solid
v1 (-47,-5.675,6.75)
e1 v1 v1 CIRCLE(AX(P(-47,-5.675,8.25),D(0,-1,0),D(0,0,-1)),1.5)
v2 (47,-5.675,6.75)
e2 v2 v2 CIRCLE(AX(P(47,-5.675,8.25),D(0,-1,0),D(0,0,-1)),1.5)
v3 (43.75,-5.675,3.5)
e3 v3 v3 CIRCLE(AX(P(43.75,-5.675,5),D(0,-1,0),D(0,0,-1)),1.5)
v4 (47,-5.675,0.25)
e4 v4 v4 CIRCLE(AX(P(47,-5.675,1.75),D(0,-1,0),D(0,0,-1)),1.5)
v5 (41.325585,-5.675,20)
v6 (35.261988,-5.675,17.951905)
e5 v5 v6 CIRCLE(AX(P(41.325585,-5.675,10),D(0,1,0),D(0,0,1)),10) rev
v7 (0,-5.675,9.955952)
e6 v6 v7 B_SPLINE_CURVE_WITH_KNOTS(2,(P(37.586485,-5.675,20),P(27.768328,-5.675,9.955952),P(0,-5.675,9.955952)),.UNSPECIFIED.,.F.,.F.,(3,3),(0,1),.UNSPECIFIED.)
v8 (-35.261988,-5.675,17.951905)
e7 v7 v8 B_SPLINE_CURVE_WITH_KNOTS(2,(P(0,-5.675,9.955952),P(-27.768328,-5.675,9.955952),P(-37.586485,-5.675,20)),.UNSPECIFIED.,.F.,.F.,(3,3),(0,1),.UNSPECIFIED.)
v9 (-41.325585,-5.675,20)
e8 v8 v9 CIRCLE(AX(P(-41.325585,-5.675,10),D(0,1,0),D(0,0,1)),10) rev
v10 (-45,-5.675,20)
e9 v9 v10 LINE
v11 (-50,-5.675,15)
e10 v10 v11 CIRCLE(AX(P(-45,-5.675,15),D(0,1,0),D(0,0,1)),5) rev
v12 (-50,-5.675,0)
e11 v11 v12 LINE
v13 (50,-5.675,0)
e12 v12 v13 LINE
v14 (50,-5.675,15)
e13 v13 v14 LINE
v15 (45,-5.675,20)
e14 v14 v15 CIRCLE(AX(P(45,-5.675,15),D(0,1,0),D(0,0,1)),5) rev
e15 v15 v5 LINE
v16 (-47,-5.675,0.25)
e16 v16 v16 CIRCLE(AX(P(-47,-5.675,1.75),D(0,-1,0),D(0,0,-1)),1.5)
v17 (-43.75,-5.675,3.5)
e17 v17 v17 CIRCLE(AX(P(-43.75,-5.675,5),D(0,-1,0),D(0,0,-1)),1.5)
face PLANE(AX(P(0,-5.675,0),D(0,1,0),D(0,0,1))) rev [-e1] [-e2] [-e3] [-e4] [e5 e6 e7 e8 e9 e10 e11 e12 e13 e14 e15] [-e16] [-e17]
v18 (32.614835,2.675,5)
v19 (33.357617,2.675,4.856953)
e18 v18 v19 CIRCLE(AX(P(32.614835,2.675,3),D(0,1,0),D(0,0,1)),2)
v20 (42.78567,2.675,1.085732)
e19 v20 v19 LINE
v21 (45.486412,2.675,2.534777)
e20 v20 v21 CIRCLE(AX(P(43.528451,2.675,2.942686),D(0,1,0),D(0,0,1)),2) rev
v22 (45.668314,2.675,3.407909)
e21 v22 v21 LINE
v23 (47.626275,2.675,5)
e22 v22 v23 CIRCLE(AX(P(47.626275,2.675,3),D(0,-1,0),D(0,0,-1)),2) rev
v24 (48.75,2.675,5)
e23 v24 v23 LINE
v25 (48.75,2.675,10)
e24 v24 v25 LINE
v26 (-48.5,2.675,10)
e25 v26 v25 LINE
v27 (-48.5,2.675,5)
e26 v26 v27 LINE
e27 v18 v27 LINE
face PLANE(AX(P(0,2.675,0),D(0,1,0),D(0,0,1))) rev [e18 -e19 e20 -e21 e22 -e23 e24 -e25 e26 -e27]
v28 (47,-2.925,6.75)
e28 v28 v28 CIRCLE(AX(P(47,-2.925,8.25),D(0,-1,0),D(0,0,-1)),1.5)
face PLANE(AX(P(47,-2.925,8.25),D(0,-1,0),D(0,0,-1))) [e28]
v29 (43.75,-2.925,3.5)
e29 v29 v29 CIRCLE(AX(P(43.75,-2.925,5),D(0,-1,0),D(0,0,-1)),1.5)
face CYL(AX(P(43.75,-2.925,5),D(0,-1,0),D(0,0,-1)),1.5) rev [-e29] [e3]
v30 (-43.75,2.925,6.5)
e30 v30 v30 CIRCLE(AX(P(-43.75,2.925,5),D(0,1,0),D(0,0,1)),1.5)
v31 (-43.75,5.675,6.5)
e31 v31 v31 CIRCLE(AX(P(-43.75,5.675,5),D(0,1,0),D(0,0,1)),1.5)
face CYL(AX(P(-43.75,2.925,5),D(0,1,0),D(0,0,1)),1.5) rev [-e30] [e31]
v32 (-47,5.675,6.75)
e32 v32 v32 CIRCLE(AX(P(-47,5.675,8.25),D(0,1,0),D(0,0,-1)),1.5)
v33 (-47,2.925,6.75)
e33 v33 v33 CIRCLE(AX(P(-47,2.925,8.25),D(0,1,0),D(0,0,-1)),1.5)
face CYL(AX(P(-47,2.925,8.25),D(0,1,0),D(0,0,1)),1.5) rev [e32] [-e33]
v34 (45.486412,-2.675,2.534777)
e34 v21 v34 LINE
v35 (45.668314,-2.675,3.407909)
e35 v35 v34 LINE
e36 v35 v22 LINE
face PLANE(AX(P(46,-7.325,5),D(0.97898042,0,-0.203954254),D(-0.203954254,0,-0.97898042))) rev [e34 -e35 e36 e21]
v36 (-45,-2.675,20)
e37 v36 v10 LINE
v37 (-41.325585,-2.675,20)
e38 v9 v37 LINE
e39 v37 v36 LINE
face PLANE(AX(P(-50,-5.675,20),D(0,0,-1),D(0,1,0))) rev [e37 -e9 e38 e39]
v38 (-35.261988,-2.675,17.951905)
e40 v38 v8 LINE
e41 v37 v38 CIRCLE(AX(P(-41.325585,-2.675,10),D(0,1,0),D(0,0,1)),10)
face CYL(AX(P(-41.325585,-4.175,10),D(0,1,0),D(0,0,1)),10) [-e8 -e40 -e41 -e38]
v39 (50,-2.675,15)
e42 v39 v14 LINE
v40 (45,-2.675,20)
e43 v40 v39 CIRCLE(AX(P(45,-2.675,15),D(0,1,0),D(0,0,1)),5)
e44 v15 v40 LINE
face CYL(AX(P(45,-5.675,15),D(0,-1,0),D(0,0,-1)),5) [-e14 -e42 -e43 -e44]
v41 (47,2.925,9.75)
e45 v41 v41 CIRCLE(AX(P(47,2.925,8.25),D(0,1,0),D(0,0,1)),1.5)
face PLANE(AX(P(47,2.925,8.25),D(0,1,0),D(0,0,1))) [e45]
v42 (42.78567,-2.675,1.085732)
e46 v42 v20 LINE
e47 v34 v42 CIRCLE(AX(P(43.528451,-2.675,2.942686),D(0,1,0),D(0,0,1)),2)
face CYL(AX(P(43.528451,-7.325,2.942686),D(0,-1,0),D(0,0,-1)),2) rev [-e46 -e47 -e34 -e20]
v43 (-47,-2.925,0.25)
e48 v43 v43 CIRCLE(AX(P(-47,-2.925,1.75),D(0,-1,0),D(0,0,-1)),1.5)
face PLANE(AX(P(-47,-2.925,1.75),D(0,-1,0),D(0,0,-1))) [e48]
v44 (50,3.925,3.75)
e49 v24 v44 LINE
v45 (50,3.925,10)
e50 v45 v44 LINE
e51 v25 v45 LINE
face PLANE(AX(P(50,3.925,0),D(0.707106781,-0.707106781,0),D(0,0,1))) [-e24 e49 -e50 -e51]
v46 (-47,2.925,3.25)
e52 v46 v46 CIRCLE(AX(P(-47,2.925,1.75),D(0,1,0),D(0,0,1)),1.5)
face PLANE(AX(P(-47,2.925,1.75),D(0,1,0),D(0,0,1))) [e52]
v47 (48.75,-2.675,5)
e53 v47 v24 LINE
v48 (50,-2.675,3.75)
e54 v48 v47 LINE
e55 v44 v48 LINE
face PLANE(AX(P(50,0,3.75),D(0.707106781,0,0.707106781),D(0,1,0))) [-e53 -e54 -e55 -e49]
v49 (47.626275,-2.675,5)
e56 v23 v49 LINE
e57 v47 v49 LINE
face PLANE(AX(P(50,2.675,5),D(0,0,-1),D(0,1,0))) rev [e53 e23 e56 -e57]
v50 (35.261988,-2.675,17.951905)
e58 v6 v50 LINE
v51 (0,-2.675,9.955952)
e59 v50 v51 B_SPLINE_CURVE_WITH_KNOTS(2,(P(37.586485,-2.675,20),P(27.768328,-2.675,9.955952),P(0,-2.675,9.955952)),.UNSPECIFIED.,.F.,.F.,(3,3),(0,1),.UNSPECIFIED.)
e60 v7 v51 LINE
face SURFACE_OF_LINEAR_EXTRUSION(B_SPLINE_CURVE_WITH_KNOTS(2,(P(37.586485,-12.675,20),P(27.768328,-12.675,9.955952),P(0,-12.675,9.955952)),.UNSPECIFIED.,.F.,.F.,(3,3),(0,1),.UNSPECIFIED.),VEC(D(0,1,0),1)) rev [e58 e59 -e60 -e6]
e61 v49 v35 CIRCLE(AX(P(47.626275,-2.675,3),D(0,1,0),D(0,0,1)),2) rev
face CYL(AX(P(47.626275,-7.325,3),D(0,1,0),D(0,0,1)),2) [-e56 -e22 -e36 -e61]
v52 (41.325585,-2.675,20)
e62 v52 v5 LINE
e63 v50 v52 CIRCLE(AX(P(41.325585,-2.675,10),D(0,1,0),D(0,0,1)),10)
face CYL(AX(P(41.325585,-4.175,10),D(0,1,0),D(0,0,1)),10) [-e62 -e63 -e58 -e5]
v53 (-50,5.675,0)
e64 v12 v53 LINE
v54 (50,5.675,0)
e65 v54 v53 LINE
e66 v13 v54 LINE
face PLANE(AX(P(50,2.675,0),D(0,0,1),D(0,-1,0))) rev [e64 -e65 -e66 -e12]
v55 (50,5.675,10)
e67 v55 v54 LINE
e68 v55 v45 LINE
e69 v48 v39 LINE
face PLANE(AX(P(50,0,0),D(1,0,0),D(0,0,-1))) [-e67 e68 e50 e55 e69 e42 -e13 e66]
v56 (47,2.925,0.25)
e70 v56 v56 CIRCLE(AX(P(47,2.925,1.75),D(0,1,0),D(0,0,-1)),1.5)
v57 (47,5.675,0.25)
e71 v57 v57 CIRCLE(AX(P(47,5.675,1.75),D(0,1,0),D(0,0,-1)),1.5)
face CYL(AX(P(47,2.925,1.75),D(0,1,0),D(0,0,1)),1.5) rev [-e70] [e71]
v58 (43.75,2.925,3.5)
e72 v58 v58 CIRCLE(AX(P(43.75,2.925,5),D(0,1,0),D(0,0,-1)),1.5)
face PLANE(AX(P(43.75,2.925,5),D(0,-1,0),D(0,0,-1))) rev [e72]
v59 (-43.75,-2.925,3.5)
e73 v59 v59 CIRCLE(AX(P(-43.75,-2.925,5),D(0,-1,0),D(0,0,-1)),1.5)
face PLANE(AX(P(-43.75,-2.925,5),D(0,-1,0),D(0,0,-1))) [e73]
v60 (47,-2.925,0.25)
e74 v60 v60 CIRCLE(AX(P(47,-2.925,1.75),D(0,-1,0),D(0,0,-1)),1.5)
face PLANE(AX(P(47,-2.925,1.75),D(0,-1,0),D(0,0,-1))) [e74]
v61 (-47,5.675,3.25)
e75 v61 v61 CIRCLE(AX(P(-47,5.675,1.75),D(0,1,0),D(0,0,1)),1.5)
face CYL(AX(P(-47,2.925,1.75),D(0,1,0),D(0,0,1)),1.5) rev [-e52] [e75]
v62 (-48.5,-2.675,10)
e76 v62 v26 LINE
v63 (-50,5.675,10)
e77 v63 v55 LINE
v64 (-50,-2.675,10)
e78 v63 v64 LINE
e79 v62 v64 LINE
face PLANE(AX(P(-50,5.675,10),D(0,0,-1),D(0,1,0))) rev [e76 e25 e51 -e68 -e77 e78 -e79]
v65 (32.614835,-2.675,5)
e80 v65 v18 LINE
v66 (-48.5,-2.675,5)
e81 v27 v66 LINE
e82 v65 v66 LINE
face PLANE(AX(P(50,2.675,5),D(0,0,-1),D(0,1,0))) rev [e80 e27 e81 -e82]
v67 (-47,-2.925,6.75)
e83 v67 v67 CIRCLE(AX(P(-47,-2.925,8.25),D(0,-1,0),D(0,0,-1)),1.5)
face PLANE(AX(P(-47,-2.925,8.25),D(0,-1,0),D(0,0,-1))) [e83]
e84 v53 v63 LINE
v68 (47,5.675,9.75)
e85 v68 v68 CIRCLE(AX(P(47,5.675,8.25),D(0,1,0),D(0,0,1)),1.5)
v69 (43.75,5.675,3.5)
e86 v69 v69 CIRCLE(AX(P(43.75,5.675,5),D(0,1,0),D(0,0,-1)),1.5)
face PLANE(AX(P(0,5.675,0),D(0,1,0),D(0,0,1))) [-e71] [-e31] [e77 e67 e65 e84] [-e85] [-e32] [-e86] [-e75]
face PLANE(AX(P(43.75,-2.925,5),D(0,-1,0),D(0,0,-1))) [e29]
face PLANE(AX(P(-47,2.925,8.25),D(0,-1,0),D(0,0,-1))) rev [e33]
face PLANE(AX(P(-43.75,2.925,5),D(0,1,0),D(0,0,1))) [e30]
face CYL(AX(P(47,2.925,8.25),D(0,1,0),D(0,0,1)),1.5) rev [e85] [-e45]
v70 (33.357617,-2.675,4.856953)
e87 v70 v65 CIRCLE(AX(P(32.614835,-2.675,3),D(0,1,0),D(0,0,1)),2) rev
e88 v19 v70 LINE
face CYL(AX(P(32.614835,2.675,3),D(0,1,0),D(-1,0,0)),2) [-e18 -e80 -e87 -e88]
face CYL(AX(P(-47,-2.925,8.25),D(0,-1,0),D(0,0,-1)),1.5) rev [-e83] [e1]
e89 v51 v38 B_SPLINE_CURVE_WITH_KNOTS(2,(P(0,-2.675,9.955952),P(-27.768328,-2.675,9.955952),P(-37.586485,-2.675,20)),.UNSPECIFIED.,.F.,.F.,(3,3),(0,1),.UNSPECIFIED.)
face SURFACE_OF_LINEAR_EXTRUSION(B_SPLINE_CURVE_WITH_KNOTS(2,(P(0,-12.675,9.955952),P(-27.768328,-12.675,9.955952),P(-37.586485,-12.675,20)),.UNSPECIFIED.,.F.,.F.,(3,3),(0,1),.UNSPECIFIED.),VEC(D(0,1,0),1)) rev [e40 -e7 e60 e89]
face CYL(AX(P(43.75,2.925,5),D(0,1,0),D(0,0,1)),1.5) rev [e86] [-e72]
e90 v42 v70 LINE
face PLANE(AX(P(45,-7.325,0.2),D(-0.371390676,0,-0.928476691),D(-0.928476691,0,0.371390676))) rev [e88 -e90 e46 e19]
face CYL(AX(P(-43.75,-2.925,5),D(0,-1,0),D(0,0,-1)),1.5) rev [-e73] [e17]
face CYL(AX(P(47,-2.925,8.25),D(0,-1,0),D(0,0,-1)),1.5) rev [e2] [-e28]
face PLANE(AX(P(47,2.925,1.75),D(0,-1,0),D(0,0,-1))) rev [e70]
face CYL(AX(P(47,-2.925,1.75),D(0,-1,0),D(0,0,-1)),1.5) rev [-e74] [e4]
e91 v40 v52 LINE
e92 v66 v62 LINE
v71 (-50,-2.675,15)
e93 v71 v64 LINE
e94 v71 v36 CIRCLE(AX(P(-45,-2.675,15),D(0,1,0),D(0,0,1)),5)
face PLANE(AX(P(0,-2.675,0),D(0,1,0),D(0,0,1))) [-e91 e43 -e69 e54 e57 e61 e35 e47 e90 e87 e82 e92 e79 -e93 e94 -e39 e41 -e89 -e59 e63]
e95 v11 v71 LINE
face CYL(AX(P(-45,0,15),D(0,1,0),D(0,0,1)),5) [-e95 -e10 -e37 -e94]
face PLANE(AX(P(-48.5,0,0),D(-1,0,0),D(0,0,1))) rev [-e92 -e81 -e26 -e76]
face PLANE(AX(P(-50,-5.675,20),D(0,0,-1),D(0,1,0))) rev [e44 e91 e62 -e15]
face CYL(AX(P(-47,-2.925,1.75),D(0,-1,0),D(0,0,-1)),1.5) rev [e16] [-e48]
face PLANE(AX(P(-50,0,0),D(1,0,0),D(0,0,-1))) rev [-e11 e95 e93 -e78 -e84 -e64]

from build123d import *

# Parameters (mm, degrees)
ESBO_O1_W                = 5
ESBO_O1_H                = 5.35
RESSALTO_EXTRUS_O1_DEPTH = 50
CORTE_EXTRUS_O5_START    = -2.675
CORTE_EXTRUS_O5_DEPTH    = 5.35
FILETE2_R                = 2
SKETCH1_W                = 100
SKETCH1_H                = 10
BOSS_EXTRUDE1_DEPTH      = 3
SKETCH2_W                = 100
SKETCH2_H                = 20
BOSS_EXTRUDE2_DEPTH      = 3
FILLET1_R                = 2
FILLET2_R                = 2
CUT_EXTRUDE1_START       = 2.925
CUT_EXTRUDE1_OUTLINE_R   = 1.5
CUT_EXTRUDE1_DEPTH       = 2.75
SKETCH6_W                = 5
SKETCH6_H                = 5.35
BOSS_EXTRUDE4_DEPTH      = 1.5
SKETCH8_R                = 1.5
CUT_EXTRUDE2_DEPTH       = 2.75
CHAMFER2_SIZE            = 1.25
CUT_EXTRUDE3_DEPTH       = 10
FILLET3_R                = 10
FILLET4_R                = 5


# Read off the part's stored shape, not the designer's step: Corte-extrusão5, Cut-Extrude1
with BuildPart() as part:
    # Esboço1 → Ressalto-extrusão1 (new, symmetric)
    with BuildSketch(Plane(origin=(0, 0, 0), x_dir=(0, 0, -1), z_dir=(1, 0, 0))):
        with Locations((-2.5, 0)):
            Rectangle(ESBO_O1_W, ESBO_O1_H)
    extrude(amount=RESSALTO_EXTRUS_O1_DEPTH, both=True)

    # Corte-extrusão5 outline → Corte-extrusão5 (cut)
    with BuildSketch(Plane(origin=(0, 0, 0), x_dir=(1, 0, 0), z_dir=(0, 1, 0)).offset(CORTE_EXTRUS_O5_START)):
        Polygon((46, -5), (45, -0.2), (33, -5), align=None)
    extrude(amount=CORTE_EXTRUS_O5_DEPTH, mode=Mode.SUBTRACT)

    # Filete2
    filete2_edges = [part.edges().sort_by_distance(p)[0] for p in [
        (46, 0, 5),
    ]]
    fillet(filete2_edges, radius=FILETE2_R)

    # Sketch1 → Boss-Extrude1 (add)
    with BuildSketch(Plane(origin=(0, 2.675, 0), x_dir=(1, 0, 0), z_dir=(0, 1, 0))):
        with Locations((0, -5)):
            Rectangle(SKETCH1_W, SKETCH1_H)
    extrude(amount=BOSS_EXTRUDE1_DEPTH)

    # Sketch2 → Boss-Extrude2 (add)
    with BuildSketch(Plane.XZ.offset(2.675)):
        with Locations((0, 10)):
            Rectangle(SKETCH2_W, SKETCH2_H)
    extrude(amount=BOSS_EXTRUDE2_DEPTH)

    # Fillet1
    fillet1_edges = [part.edges().sort_by_distance(p)[0] for p in [
        (45, 0, 0.2),
    ]]
    fillet(fillet1_edges, radius=FILLET1_R)

    # Fillet2
    fillet2_edges = [part.edges().sort_by_distance(p)[0] for p in [
        (33, 0, 5),
    ]]
    fillet(fillet2_edges, radius=FILLET2_R)

    # Cut-Extrude1 outline → Cut-Extrude1 (cut)
    with BuildSketch(Plane(origin=(0, 0, 0), x_dir=(1, 0, 0), z_dir=(0, 1, 0)).offset(CUT_EXTRUDE1_START)):
        with Locations((-43.75, -5)):
            Circle(CUT_EXTRUDE1_OUTLINE_R)
        with Locations((43.75, -5)):
            Circle(CUT_EXTRUDE1_OUTLINE_R)
        with Locations((47, -1.75)):
            Circle(CUT_EXTRUDE1_OUTLINE_R)
        with Locations((47, -8.25)):
            Circle(CUT_EXTRUDE1_OUTLINE_R)
        with Locations((-47, -8.25)):
            Circle(CUT_EXTRUDE1_OUTLINE_R)
        with Locations((-47, -1.75)):
            Circle(CUT_EXTRUDE1_OUTLINE_R)
    extrude(amount=CUT_EXTRUDE1_DEPTH, mode=Mode.SUBTRACT)

    # Sketch6 → Boss-Extrude4 (add)
    with BuildSketch(Plane.ZY.offset(50)):
        with Locations((7.5, 0)):
            Rectangle(SKETCH6_W, SKETCH6_H)
    extrude(amount=-BOSS_EXTRUDE4_DEPTH)

    # Sketch8 → Cut-Extrude2 (cut)
    with BuildSketch(Plane.XZ.offset(5.675)):
        with Locations(Location((47, 8.25, 0), (0, 0, 90))):
            Circle(SKETCH8_R)
        with Locations(Location((43.75, 5, 0), (0, 0, 270))):
            Circle(SKETCH8_R)
        with Locations(Location((47, 1.75, 0), (0, 0, 270))):
            Circle(SKETCH8_R)
        with Locations(Location((-47, 8.25, 0), (0, 0, 270))):
            Circle(SKETCH8_R)
        with Locations(Location((-43.75, 5, 0), (0, 0, 90))):
            Circle(SKETCH8_R)
        with Locations(Location((-47, 1.75, 0), (0, 0, 90))):
            Circle(SKETCH8_R)
    extrude(amount=-CUT_EXTRUDE2_DEPTH, mode=Mode.SUBTRACT)

    # Chamfer2
    chamfer2_edges = [part.edges().sort_by_distance(p)[0] for p in [
        (50, 2.675, 7.5),
        (50, 0, 5),
    ]]
    chamfer(chamfer2_edges, length=CHAMFER2_SIZE)

    # Sketch10 → Cut-Extrude3 (cut)
    with BuildSketch(Plane(origin=(0, -2.675, 0), x_dir=(1, 0, 0), z_dir=(0, 1, 0))):
        with BuildLine():
            Line((-37.586485056, -20), (37.586485056, -20))
            add(Edge.make_bspline(
                [(37.586485056, -20), (27.768328162, -9.955951582), (0, -9.955951582)],
                knots=[0, 0, 0, 1, 1, 1], degree=2))
            add(Edge.make_bspline(
                [(-37.586485056, -20), (-27.768328162, -9.955951582), (0, -9.955951582)],
                knots=[0, 0, 0, 1, 1, 1], degree=2))
        make_face()
    extrude(amount=-CUT_EXTRUDE3_DEPTH, mode=Mode.SUBTRACT)

    # Fillet3
    fillet3_edges = [part.edges().sort_by_distance(p)[0] for p in [
        (37.586485056, -4.175, 20),
        (-37.586485056, -4.175, 20),
    ]]
    fillet(fillet3_edges, radius=FILLET3_R)

    # Fillet4
    fillet4_edges = [part.edges().sort_by_distance(p)[0] for p in [
        (-50, -4.175, 20),
        (50, -4.175, 20),
    ]]
    fillet(fillet4_edges, radius=FILLET4_R)


solid = part.part
